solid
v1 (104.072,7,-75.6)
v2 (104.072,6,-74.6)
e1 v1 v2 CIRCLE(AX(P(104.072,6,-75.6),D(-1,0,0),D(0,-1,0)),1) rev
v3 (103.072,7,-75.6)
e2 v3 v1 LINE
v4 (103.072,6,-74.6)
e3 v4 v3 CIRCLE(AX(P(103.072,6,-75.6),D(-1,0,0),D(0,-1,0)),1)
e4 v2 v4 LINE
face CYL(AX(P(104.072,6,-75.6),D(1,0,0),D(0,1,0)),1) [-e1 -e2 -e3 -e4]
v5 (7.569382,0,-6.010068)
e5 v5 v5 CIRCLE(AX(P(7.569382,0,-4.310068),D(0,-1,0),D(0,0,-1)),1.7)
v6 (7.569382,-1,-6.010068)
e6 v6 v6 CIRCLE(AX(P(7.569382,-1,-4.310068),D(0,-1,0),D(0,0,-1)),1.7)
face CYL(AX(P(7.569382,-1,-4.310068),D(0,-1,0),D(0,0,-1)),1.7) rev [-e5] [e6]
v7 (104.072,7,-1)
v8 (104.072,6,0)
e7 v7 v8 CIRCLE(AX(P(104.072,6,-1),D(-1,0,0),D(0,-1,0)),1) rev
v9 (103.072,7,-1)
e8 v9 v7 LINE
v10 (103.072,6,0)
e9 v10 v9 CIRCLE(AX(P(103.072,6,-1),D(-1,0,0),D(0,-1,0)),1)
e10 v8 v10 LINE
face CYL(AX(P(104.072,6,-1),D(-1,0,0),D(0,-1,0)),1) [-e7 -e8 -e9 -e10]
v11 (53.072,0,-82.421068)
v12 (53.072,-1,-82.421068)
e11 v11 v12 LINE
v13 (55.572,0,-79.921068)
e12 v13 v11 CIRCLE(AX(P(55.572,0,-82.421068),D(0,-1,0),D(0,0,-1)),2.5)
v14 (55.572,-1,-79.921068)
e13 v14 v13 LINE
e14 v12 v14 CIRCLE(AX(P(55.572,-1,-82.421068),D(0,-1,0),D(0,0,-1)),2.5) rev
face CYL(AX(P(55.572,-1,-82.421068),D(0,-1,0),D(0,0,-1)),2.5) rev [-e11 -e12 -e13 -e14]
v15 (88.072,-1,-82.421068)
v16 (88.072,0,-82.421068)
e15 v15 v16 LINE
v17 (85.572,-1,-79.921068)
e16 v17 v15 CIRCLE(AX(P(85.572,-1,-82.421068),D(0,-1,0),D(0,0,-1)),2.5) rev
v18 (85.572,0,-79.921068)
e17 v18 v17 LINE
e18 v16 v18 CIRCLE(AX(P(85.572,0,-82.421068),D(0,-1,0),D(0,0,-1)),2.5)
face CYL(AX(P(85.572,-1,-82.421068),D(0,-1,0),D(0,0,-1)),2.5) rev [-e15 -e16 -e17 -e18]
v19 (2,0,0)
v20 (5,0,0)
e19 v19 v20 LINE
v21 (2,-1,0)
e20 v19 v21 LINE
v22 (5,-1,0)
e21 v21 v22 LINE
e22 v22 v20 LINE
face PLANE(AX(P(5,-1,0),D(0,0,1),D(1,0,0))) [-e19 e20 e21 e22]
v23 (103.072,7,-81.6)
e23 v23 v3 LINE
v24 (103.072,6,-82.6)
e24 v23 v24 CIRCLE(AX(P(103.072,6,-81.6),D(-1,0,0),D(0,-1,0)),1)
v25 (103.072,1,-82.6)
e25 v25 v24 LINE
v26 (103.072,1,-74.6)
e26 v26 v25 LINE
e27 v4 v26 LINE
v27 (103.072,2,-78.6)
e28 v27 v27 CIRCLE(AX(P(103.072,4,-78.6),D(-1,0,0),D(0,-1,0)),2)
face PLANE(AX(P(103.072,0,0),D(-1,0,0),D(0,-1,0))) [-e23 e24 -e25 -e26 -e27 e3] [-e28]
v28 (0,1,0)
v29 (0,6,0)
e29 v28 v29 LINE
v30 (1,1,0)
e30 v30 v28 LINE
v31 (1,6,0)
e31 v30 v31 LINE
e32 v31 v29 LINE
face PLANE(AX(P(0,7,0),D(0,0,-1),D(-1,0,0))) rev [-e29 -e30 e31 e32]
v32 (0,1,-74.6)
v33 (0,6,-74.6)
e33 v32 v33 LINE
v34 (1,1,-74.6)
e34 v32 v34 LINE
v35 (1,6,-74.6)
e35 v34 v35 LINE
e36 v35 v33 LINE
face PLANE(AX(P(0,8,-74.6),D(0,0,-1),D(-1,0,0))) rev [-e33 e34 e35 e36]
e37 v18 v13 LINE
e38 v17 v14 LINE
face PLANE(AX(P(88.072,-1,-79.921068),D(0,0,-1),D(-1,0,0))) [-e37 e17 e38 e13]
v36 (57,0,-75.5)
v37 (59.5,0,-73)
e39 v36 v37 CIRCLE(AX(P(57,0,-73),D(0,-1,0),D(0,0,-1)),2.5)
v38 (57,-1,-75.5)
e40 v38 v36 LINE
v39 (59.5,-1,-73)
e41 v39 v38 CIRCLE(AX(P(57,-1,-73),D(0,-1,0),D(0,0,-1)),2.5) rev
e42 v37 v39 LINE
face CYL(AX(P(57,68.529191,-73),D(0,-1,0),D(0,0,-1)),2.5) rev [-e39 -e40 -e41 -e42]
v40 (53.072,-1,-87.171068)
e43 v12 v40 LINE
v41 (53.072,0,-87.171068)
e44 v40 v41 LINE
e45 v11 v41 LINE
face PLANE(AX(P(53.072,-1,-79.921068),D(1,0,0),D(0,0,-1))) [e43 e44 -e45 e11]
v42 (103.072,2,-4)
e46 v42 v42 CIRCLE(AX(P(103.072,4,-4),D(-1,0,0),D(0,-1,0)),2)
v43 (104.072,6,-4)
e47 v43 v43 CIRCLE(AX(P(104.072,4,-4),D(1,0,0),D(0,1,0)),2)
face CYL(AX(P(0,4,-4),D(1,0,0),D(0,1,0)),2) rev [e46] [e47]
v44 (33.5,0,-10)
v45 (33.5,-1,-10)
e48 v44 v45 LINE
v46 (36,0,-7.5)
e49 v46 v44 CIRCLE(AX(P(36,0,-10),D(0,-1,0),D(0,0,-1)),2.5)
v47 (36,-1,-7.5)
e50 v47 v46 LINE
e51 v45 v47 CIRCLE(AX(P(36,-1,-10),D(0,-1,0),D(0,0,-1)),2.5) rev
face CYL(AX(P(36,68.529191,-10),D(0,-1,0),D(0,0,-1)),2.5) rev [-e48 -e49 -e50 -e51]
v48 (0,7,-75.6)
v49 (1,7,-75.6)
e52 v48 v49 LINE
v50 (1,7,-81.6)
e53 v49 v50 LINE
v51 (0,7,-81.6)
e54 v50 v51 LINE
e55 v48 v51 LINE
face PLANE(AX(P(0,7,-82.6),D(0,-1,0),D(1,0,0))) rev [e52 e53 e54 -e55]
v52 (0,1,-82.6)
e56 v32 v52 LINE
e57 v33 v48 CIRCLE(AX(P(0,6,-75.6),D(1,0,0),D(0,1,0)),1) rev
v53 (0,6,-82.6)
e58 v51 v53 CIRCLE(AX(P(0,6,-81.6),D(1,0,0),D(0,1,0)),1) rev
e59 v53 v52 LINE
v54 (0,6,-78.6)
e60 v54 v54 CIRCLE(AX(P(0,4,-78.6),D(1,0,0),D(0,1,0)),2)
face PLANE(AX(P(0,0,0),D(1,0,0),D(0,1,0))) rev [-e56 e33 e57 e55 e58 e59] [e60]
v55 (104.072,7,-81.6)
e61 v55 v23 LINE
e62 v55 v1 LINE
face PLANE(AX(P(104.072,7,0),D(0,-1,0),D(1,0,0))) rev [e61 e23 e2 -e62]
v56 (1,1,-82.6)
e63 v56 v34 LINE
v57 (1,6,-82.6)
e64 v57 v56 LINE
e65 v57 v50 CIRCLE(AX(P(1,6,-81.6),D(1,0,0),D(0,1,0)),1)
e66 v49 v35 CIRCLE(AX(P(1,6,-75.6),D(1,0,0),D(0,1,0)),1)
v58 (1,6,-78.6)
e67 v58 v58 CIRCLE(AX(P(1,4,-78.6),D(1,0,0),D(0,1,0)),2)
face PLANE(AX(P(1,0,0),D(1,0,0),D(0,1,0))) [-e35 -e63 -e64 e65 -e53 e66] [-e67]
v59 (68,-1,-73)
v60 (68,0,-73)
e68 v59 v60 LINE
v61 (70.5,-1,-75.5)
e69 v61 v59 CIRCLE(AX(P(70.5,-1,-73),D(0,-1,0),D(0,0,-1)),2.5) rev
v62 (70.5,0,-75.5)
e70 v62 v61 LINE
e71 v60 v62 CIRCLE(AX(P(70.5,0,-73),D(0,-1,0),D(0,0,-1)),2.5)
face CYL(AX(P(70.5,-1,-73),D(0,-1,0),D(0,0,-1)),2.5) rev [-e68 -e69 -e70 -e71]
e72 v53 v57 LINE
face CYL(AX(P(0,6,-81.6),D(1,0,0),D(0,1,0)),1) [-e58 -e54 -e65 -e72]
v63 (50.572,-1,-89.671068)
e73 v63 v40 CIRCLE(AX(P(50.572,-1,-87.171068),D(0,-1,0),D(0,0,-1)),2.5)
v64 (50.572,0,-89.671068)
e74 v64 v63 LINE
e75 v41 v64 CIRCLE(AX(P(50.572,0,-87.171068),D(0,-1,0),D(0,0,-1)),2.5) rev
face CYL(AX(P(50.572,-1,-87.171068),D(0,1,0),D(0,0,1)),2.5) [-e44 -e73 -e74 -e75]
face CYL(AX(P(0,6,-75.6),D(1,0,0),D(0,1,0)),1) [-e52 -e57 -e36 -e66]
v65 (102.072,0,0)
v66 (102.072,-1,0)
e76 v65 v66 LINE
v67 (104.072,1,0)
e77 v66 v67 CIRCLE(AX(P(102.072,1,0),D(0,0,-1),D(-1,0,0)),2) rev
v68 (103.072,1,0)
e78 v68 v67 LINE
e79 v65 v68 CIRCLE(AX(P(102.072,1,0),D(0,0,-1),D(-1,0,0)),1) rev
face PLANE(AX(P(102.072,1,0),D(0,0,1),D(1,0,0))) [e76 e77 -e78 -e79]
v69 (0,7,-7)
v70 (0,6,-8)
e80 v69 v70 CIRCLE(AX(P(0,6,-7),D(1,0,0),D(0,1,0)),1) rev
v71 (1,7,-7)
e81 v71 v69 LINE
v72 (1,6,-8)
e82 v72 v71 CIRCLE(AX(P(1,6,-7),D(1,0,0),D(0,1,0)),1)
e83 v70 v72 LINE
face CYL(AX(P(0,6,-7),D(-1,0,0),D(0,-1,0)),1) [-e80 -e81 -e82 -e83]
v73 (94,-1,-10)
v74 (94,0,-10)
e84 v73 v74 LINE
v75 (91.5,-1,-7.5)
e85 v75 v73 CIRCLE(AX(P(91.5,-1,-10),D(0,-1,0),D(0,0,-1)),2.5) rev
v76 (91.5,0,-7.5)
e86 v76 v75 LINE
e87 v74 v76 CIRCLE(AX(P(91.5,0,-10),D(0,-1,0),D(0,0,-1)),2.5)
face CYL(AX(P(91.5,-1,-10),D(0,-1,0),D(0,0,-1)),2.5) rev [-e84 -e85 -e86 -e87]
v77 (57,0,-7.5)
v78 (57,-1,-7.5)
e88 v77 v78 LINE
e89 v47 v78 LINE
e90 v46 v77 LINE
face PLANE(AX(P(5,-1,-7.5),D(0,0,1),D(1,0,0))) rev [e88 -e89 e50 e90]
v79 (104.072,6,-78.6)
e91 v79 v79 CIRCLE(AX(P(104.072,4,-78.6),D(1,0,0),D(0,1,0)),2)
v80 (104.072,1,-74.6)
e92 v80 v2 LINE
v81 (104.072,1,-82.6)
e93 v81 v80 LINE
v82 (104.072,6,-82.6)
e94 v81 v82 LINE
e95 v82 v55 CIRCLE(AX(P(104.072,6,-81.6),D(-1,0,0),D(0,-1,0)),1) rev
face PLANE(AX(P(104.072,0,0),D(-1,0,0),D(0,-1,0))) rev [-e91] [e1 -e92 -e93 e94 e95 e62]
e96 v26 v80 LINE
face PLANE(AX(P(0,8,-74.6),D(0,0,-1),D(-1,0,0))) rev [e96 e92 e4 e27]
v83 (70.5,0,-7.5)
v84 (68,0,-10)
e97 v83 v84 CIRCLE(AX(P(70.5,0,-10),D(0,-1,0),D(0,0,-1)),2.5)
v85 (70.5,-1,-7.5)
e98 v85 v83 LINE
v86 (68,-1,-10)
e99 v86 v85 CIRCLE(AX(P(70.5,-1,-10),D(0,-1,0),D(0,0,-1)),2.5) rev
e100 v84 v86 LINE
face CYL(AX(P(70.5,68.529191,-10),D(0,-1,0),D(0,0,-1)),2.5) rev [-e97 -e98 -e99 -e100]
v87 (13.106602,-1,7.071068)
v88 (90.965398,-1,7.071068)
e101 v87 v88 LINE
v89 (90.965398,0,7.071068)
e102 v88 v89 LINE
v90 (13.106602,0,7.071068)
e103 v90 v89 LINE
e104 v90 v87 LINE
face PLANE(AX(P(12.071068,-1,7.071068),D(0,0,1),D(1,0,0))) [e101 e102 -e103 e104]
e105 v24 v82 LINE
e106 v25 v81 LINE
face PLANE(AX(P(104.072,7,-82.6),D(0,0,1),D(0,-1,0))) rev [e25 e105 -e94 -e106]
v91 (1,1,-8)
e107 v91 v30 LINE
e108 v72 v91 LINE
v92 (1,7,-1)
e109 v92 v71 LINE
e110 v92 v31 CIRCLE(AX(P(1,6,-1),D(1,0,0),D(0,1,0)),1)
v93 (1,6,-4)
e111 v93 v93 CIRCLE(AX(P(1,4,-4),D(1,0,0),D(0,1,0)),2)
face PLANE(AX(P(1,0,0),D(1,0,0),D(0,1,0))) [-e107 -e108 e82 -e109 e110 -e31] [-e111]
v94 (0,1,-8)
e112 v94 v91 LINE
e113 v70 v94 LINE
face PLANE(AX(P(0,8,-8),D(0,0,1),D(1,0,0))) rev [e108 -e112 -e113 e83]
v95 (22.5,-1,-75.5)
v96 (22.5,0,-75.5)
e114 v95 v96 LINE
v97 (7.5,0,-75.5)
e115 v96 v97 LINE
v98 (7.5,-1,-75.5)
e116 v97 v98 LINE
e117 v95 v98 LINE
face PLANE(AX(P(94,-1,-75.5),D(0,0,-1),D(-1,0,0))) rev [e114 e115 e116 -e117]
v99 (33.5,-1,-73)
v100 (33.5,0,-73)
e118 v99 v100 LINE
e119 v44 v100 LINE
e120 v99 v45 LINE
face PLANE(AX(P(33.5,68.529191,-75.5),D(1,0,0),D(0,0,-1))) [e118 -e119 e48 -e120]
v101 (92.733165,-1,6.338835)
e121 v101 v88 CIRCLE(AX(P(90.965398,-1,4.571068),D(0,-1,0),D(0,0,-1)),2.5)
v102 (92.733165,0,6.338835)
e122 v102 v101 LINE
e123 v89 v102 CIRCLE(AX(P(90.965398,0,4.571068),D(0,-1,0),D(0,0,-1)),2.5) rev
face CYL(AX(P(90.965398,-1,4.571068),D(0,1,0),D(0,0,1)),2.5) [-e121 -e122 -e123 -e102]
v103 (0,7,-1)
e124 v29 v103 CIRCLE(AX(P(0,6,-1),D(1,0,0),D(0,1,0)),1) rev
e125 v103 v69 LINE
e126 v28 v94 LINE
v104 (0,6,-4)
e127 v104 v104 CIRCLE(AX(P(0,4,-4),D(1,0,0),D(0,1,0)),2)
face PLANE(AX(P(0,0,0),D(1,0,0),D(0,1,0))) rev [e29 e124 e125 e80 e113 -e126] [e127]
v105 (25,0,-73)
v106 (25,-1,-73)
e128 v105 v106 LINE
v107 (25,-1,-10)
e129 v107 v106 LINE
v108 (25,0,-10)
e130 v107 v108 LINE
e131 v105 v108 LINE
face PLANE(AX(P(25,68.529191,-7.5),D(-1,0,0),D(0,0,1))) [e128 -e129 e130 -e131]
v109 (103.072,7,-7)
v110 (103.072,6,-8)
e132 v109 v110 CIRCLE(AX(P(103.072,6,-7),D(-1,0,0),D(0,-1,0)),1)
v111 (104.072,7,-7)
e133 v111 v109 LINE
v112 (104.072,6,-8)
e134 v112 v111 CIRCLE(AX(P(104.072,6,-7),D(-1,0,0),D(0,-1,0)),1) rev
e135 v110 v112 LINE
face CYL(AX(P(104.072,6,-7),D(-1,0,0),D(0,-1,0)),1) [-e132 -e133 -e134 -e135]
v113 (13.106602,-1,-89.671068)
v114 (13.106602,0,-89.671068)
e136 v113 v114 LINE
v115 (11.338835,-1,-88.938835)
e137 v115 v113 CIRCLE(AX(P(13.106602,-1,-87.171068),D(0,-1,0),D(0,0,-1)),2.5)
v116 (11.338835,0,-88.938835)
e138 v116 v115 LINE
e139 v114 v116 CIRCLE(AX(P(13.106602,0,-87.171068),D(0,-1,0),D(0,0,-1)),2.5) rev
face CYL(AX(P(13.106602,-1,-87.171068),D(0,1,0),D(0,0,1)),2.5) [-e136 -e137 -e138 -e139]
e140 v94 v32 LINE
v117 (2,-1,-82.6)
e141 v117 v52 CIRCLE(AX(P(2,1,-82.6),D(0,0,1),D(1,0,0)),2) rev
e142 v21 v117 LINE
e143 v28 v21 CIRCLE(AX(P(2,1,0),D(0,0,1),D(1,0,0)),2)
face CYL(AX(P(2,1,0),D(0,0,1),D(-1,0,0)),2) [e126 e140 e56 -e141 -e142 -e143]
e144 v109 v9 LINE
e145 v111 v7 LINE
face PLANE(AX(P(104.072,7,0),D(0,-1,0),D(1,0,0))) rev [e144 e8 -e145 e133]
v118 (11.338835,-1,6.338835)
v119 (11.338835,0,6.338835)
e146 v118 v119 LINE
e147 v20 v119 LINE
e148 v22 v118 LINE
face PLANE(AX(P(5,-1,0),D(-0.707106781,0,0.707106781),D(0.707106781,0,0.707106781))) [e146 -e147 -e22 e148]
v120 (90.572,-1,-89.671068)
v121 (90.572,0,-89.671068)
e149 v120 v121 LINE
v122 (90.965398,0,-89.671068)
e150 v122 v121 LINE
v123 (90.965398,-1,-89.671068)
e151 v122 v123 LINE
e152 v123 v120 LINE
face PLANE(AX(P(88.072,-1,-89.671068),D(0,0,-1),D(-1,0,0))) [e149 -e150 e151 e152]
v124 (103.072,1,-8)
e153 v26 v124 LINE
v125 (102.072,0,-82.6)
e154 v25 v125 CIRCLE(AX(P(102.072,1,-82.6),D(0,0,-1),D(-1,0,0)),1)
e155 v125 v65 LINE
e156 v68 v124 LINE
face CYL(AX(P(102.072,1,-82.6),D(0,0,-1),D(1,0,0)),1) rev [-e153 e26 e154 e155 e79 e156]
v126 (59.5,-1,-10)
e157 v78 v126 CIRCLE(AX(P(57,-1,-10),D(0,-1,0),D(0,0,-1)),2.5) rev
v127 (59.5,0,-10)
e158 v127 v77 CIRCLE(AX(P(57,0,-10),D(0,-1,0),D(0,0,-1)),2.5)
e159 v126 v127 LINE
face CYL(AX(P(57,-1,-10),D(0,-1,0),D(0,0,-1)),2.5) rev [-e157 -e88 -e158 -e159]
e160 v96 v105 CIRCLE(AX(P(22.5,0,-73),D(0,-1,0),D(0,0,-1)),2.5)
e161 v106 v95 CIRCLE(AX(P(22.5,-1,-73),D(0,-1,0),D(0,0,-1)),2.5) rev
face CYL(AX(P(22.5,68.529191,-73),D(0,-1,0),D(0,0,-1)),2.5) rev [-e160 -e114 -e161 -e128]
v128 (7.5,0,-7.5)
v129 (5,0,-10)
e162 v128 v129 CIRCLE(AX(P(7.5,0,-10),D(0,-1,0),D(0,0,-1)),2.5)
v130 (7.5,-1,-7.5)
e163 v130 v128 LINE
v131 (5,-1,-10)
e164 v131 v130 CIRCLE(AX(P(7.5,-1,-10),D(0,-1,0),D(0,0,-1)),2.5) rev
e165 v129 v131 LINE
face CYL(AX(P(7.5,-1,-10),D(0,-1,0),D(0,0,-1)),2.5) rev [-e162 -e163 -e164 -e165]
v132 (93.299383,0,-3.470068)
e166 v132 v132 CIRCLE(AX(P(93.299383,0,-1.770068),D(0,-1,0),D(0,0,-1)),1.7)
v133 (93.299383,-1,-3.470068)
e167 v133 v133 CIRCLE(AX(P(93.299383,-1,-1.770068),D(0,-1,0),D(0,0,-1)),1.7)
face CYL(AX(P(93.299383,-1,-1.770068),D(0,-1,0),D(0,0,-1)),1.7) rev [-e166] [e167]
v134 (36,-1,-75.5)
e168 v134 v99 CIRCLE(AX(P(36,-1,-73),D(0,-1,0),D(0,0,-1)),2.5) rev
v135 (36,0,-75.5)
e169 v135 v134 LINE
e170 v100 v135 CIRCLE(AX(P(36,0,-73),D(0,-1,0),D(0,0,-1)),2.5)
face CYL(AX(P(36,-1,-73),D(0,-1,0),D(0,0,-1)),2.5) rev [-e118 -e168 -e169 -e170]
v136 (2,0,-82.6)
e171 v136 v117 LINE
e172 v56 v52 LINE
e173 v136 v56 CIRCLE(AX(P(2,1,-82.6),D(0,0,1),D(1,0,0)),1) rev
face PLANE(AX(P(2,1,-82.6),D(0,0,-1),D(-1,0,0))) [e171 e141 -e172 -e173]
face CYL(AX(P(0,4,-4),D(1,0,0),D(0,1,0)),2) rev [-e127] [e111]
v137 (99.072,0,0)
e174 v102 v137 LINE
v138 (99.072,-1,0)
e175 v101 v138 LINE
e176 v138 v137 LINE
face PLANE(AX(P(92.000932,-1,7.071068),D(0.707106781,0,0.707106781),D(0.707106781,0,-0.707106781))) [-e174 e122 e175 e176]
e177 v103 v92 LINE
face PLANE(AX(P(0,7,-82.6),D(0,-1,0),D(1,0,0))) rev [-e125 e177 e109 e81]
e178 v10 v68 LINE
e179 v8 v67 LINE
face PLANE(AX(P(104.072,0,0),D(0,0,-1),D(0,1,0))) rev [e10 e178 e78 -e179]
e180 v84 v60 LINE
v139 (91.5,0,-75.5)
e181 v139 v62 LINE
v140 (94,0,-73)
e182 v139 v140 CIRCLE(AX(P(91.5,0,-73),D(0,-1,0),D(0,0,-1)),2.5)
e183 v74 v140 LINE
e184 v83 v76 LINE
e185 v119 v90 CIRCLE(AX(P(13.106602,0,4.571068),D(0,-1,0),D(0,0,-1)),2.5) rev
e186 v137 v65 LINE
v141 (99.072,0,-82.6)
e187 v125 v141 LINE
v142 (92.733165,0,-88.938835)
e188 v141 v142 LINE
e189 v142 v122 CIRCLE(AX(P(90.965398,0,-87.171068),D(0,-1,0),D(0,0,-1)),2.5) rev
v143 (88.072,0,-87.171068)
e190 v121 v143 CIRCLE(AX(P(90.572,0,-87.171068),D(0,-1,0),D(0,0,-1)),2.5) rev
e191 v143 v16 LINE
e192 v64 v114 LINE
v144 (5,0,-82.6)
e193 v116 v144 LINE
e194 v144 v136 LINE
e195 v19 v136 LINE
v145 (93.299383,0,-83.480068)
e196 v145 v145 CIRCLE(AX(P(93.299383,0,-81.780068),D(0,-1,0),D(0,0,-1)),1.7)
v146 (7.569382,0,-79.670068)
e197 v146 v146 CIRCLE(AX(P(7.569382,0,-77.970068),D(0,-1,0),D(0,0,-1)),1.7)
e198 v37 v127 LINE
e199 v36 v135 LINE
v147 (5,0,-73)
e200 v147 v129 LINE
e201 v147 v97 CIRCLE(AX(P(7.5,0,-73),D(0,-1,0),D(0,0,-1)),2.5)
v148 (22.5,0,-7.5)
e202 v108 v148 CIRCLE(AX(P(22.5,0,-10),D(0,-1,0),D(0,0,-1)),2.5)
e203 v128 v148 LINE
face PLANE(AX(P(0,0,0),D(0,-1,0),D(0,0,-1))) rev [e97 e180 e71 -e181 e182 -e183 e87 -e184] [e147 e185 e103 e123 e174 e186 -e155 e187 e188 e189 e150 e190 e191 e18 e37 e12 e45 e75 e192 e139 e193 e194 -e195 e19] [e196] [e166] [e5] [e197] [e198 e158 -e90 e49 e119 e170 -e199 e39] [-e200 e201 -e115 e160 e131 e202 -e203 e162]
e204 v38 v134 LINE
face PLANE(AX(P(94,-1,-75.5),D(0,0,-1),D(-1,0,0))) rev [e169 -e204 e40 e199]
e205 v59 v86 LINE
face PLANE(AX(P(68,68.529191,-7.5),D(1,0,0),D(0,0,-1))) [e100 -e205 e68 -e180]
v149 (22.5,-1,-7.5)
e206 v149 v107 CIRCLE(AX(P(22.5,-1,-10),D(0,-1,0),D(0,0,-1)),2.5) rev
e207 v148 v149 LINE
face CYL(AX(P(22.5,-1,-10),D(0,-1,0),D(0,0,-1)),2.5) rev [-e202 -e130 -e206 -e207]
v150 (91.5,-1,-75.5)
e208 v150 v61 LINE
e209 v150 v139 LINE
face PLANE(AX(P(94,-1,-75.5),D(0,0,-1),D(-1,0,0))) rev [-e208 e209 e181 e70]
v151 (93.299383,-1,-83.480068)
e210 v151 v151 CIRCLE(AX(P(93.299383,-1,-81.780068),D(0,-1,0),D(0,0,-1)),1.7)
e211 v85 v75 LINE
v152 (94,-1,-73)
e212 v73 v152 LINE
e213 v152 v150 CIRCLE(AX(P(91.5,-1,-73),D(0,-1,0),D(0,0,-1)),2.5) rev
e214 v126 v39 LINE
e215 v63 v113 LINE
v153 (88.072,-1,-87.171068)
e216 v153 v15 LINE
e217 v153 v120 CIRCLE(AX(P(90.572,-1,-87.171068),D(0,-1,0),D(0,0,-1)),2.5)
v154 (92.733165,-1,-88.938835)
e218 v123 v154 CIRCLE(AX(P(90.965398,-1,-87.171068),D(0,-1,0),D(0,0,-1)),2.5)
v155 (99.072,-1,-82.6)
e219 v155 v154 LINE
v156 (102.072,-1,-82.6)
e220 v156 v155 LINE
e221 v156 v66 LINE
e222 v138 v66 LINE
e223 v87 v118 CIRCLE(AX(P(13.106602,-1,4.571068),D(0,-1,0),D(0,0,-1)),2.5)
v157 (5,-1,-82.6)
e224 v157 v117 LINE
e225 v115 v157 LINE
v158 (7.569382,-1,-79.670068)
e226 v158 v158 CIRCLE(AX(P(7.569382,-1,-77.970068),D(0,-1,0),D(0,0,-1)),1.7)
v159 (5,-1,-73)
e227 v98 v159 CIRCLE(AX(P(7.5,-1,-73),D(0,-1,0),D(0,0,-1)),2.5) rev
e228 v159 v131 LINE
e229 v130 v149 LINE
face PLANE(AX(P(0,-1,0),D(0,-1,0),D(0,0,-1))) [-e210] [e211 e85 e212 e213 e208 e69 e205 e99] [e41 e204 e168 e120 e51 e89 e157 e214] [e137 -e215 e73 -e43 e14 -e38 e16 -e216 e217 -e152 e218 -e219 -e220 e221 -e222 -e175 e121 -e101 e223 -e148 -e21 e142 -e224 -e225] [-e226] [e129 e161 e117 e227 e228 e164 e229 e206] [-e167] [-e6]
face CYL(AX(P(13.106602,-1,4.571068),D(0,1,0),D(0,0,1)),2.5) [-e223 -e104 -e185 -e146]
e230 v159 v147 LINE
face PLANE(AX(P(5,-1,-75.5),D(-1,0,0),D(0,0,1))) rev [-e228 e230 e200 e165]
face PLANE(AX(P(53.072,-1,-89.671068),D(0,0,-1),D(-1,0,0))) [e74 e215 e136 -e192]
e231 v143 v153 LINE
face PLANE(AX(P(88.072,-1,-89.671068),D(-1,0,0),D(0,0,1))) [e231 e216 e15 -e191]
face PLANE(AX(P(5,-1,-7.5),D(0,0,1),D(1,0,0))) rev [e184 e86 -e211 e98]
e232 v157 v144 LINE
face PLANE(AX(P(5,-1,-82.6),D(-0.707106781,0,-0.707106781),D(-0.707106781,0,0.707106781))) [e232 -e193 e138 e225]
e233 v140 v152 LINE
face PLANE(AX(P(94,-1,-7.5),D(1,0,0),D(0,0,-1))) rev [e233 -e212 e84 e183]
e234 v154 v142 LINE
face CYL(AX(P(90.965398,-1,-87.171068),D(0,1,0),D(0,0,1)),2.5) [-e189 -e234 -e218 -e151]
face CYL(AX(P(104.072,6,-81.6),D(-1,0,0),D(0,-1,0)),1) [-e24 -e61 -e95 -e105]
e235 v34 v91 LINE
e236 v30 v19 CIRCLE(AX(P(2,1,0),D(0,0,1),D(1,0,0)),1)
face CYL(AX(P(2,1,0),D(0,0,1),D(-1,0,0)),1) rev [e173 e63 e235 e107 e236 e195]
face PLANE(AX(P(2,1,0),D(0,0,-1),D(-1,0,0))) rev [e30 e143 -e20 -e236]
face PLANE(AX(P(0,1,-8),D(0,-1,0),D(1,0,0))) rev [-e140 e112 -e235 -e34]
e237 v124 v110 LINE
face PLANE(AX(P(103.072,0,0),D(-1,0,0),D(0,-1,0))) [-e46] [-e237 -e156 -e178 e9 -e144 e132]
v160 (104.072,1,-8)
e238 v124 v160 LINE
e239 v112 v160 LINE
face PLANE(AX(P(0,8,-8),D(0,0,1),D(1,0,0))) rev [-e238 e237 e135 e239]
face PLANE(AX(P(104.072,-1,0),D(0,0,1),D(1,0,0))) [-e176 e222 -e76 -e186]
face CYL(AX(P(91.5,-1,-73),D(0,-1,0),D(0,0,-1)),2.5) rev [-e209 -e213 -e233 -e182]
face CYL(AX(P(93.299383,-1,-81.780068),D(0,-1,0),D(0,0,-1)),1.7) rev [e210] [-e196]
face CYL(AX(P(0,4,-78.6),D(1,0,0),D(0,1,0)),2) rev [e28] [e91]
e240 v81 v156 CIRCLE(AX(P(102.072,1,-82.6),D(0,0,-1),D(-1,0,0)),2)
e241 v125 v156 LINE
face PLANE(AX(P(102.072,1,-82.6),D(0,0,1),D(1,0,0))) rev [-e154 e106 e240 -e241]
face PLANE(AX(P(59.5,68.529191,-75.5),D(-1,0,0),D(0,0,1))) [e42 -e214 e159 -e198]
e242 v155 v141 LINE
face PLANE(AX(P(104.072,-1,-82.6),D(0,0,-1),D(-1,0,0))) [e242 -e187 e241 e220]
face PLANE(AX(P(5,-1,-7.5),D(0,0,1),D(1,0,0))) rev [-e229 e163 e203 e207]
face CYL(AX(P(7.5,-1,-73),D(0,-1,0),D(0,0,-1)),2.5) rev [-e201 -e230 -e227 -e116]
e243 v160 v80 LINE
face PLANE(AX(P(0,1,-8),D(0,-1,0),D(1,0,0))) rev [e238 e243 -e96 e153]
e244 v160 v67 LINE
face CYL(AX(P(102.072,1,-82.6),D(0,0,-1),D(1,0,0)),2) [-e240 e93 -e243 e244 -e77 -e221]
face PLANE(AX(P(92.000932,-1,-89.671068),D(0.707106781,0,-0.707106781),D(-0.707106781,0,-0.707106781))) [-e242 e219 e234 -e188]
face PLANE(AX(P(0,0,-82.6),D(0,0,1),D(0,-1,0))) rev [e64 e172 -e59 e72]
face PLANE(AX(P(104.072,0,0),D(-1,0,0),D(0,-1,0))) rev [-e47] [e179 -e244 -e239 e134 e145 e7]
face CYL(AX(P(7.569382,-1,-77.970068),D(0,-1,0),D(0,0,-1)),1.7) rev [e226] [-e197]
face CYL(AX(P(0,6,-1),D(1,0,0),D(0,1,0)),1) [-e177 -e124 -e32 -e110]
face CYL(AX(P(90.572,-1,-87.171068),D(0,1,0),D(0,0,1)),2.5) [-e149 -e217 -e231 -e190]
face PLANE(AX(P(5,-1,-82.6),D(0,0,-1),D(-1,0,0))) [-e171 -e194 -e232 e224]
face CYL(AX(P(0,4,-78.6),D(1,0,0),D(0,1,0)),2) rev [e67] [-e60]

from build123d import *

# Parameters (mm, degrees)
SKETCH1_W                      = 89
SKETCH1_H                      = 68
BASE_FLANGE2_DEPTH             = 1
EDGE_FLANGE1_STRIP_W           = 6
EDGE_FLANGE1_STRIP_H           = 1
EDGE_FLANGE1_STRIP_CUT_DEPTH   = 82.6
EDGE_FLANGE1_STRIP_2_W         = 6
EDGE_FLANGE1_STRIP_2_H         = 1
EDGE_FLANGE1_STRIP_CUT_2_DEPTH = 82.6
EDGE_FLANGE1_DEPTH             = 82.6
EDGE_FLANGE1_BEND_DEPTH        = 82.6
SKETCH16_W                     = 66.6
SKETCH16_H                     = 7
CUT_EXTRUDE1_DEPTH             = 138.553195479
FILLET1_R                      = 1
SKETCH17_R                     = 2
CUT_EXTRUDE2_DEPTH             = 138.553195479
M3_CLEARANCE_HOLE1_D           = 3.4
FILLET2_R                      = 2.5
SKETCH20_W                     = 8.5
SKETCH20_H                     = 68
BOSS_EXTRUDE1_DEPTH            = 1
FILLET3_R                      = 2.5


# Sheet-metal steps are written as plain solids
with BuildPart() as part:
    # Sketch1 → Base-Flange2 (new body)
    with BuildSketch(Plane(origin=(0, 0, 0), x_dir=(1, 0, 0), z_dir=(0, 1, 0))):
        Polygon((0, 0), (0, 82.6), (5, 82.6), (12.071067812, 89.671067812), (53.072, 89.671067812), (53.072, 79.921067812), (88.072, 79.921067812), (88.072, 89.671067812), (92.000932188, 89.671067812), (99.072, 82.6), (104.072, 82.6), (104.072, 0), (99.072, 0), (92.000932188, -7.071067812), (12.071067812, -7.071067812), (5, 0), align=None)
        with Locations((49.5, 41.5)):
            Rectangle(SKETCH1_W, SKETCH1_H, mode=Mode.SUBTRACT)
    extrude(amount=-BASE_FLANGE2_DEPTH)

    # Edge-Flange1 strip (across the edge) → Edge-Flange1 strip cut (cut)
    with BuildSketch(Plane(origin=(104.072, 0, 0), x_dir=(-1, 0, 0), z_dir=(0, 0, -1))):
        with Locations((-1, -0.5)):
            Rectangle(EDGE_FLANGE1_STRIP_W, EDGE_FLANGE1_STRIP_H)
    extrude(amount=EDGE_FLANGE1_STRIP_CUT_DEPTH, mode=Mode.SUBTRACT)

    # Edge-Flange1 strip 2 (across the edge) → Edge-Flange1 strip cut 2 (cut)
    with BuildSketch(Plane.XY.offset(-82.6)):
        with Locations((-1, -0.5)):
            Rectangle(EDGE_FLANGE1_STRIP_2_W, EDGE_FLANGE1_STRIP_2_H)
    extrude(amount=EDGE_FLANGE1_STRIP_CUT_2_DEPTH, mode=Mode.SUBTRACT)

    # Edge-Flange1 section (across the edge) → Edge-Flange1 (add)
    with BuildSketch(Plane(origin=(104.072, 0, 0), x_dir=(-1, 0, 0), z_dir=(0, 0, -1))):
        with BuildLine():
            Line((0, 1), (0, 7))
            Line((0, 7), (1, 7))
            Line((1, 7), (1, 1))
            ThreePointArc((1, 1), (1.292893219, 0.292893219), (2, 0))
            Line((2, 0), (2, -1))
            ThreePointArc((2, -1), (0.585786438, -0.414213562), (0, 1))
        make_face()
    extrude(amount=EDGE_FLANGE1_DEPTH)

    # Edge-Flange1 section 2 (across the edge) → Edge-Flange1 bend (add)
    with BuildSketch(Plane.XY.offset(-82.6)):
        with BuildLine():
            Line((0, 1), (0, 7))
            Line((0, 7), (1, 7))
            Line((1, 7), (1, 1))
            ThreePointArc((1, 1), (1.292893219, 0.292893219), (2, 0))
            Line((2, 0), (2, -1))
            ThreePointArc((2, -1), (0.585786438, -0.414213562), (0, 1))
        make_face()
    extrude(amount=EDGE_FLANGE1_BEND_DEPTH)

    # Sketch16 → Cut-Extrude1 (cut, through all)
    with BuildSketch(Plane(origin=(104.072, 0, 0), x_dir=(0, 0, -1), z_dir=(1, 0, 0))):
        with Locations((41.3, 4.5)):
            Rectangle(SKETCH16_W, SKETCH16_H)
    extrude(amount=-CUT_EXTRUDE1_DEPTH, mode=Mode.SUBTRACT)

    # Fillet1
    fillet1_edges = [part.edges().sort_by_distance(p)[0] for p in [
        (0.5, 7, -82.6),
        (0.5, 7, 0),
        (0.5, 7, -74.6),
        (0.5, 7, -8),
        (103.572, 7, -8),
        (103.572, 7, -74.6),
        (103.572, 7, 0),
        (103.572, 7, -82.6),
    ]]
    fillet(fillet1_edges, radius=FILLET1_R)

    # Sketch17 → Cut-Extrude2 (cut, through all)
    with BuildSketch(Plane(origin=(104.072, 0, 0), x_dir=(0, 0, -1), z_dir=(1, 0, 0))):
        with Locations(Location((4, 4, 0), (0, 0, 90))):
            Circle(SKETCH17_R)
        with Locations(Location((78.6, 4, 0), (0, 0, 90))):
            Circle(SKETCH17_R)
    extrude(amount=-CUT_EXTRUDE2_DEPTH, mode=Mode.SUBTRACT)

    # M3 Clearance Hole1 (through all)
    with Locations(Plane(origin=(0, -1, 0), x_dir=(-1, 0, 0), z_dir=(0, -1, 0))):
        with Locations((-93.299383015, 81.780067732), (-7.569381755, 77.970067732), (-7.569381755, 4.310067732), (-93.299383015, 1.770067732)):
            Hole(M3_CLEARANCE_HOLE1_D / 2)

    # Fillet2
    fillet2_edges = [part.edges().sort_by_distance(p)[0] for p in [
        (12.071067812, -0.5, -89.671067812),
        (53.072, -0.5, -89.671067812),
        (53.072, -0.5, -79.921067812),
        (88.072, -0.5, -79.921067812),
        (88.072, -0.5, -89.671067812),
        (92.000932188, -0.5, -89.671067812),
        (92.000932188, -0.5, 7.071067812),
        (12.071067812, -0.5, 7.071067812),
        (5, -0.5, -75.5),
        (94, -0.5, -75.5),
        (94, -0.5, -7.5),
        (5, -0.5, -7.5),
    ]]
    fillet(fillet2_edges, radius=FILLET2_R)

    # Sketch20 → Boss-Extrude1 (add)
    with BuildSketch(Plane.XZ.offset(1)):
        with Locations((29.25, -41.5)):
            Rectangle(SKETCH20_W, SKETCH20_H)
        with Locations((63.75, -41.5)):
            Rectangle(SKETCH20_W, SKETCH20_H)
    extrude(amount=-BOSS_EXTRUDE1_DEPTH)

    # Fillet3
    fillet3_edges = [part.edges().sort_by_distance(p)[0] for p in [
        (33.5, -0.5, -75.5),
        (25, -0.5, -75.5),
        (25, -0.5, -7.5),
        (33.5, -0.5, -7.5),
        (68, -0.5, -75.5),
        (59.5, -0.5, -75.5),
        (59.5, -0.5, -7.5),
        (68, -0.5, -7.5),
    ]]
    fillet(fillet3_edges, radius=FILLET3_R)


solid = part.part
